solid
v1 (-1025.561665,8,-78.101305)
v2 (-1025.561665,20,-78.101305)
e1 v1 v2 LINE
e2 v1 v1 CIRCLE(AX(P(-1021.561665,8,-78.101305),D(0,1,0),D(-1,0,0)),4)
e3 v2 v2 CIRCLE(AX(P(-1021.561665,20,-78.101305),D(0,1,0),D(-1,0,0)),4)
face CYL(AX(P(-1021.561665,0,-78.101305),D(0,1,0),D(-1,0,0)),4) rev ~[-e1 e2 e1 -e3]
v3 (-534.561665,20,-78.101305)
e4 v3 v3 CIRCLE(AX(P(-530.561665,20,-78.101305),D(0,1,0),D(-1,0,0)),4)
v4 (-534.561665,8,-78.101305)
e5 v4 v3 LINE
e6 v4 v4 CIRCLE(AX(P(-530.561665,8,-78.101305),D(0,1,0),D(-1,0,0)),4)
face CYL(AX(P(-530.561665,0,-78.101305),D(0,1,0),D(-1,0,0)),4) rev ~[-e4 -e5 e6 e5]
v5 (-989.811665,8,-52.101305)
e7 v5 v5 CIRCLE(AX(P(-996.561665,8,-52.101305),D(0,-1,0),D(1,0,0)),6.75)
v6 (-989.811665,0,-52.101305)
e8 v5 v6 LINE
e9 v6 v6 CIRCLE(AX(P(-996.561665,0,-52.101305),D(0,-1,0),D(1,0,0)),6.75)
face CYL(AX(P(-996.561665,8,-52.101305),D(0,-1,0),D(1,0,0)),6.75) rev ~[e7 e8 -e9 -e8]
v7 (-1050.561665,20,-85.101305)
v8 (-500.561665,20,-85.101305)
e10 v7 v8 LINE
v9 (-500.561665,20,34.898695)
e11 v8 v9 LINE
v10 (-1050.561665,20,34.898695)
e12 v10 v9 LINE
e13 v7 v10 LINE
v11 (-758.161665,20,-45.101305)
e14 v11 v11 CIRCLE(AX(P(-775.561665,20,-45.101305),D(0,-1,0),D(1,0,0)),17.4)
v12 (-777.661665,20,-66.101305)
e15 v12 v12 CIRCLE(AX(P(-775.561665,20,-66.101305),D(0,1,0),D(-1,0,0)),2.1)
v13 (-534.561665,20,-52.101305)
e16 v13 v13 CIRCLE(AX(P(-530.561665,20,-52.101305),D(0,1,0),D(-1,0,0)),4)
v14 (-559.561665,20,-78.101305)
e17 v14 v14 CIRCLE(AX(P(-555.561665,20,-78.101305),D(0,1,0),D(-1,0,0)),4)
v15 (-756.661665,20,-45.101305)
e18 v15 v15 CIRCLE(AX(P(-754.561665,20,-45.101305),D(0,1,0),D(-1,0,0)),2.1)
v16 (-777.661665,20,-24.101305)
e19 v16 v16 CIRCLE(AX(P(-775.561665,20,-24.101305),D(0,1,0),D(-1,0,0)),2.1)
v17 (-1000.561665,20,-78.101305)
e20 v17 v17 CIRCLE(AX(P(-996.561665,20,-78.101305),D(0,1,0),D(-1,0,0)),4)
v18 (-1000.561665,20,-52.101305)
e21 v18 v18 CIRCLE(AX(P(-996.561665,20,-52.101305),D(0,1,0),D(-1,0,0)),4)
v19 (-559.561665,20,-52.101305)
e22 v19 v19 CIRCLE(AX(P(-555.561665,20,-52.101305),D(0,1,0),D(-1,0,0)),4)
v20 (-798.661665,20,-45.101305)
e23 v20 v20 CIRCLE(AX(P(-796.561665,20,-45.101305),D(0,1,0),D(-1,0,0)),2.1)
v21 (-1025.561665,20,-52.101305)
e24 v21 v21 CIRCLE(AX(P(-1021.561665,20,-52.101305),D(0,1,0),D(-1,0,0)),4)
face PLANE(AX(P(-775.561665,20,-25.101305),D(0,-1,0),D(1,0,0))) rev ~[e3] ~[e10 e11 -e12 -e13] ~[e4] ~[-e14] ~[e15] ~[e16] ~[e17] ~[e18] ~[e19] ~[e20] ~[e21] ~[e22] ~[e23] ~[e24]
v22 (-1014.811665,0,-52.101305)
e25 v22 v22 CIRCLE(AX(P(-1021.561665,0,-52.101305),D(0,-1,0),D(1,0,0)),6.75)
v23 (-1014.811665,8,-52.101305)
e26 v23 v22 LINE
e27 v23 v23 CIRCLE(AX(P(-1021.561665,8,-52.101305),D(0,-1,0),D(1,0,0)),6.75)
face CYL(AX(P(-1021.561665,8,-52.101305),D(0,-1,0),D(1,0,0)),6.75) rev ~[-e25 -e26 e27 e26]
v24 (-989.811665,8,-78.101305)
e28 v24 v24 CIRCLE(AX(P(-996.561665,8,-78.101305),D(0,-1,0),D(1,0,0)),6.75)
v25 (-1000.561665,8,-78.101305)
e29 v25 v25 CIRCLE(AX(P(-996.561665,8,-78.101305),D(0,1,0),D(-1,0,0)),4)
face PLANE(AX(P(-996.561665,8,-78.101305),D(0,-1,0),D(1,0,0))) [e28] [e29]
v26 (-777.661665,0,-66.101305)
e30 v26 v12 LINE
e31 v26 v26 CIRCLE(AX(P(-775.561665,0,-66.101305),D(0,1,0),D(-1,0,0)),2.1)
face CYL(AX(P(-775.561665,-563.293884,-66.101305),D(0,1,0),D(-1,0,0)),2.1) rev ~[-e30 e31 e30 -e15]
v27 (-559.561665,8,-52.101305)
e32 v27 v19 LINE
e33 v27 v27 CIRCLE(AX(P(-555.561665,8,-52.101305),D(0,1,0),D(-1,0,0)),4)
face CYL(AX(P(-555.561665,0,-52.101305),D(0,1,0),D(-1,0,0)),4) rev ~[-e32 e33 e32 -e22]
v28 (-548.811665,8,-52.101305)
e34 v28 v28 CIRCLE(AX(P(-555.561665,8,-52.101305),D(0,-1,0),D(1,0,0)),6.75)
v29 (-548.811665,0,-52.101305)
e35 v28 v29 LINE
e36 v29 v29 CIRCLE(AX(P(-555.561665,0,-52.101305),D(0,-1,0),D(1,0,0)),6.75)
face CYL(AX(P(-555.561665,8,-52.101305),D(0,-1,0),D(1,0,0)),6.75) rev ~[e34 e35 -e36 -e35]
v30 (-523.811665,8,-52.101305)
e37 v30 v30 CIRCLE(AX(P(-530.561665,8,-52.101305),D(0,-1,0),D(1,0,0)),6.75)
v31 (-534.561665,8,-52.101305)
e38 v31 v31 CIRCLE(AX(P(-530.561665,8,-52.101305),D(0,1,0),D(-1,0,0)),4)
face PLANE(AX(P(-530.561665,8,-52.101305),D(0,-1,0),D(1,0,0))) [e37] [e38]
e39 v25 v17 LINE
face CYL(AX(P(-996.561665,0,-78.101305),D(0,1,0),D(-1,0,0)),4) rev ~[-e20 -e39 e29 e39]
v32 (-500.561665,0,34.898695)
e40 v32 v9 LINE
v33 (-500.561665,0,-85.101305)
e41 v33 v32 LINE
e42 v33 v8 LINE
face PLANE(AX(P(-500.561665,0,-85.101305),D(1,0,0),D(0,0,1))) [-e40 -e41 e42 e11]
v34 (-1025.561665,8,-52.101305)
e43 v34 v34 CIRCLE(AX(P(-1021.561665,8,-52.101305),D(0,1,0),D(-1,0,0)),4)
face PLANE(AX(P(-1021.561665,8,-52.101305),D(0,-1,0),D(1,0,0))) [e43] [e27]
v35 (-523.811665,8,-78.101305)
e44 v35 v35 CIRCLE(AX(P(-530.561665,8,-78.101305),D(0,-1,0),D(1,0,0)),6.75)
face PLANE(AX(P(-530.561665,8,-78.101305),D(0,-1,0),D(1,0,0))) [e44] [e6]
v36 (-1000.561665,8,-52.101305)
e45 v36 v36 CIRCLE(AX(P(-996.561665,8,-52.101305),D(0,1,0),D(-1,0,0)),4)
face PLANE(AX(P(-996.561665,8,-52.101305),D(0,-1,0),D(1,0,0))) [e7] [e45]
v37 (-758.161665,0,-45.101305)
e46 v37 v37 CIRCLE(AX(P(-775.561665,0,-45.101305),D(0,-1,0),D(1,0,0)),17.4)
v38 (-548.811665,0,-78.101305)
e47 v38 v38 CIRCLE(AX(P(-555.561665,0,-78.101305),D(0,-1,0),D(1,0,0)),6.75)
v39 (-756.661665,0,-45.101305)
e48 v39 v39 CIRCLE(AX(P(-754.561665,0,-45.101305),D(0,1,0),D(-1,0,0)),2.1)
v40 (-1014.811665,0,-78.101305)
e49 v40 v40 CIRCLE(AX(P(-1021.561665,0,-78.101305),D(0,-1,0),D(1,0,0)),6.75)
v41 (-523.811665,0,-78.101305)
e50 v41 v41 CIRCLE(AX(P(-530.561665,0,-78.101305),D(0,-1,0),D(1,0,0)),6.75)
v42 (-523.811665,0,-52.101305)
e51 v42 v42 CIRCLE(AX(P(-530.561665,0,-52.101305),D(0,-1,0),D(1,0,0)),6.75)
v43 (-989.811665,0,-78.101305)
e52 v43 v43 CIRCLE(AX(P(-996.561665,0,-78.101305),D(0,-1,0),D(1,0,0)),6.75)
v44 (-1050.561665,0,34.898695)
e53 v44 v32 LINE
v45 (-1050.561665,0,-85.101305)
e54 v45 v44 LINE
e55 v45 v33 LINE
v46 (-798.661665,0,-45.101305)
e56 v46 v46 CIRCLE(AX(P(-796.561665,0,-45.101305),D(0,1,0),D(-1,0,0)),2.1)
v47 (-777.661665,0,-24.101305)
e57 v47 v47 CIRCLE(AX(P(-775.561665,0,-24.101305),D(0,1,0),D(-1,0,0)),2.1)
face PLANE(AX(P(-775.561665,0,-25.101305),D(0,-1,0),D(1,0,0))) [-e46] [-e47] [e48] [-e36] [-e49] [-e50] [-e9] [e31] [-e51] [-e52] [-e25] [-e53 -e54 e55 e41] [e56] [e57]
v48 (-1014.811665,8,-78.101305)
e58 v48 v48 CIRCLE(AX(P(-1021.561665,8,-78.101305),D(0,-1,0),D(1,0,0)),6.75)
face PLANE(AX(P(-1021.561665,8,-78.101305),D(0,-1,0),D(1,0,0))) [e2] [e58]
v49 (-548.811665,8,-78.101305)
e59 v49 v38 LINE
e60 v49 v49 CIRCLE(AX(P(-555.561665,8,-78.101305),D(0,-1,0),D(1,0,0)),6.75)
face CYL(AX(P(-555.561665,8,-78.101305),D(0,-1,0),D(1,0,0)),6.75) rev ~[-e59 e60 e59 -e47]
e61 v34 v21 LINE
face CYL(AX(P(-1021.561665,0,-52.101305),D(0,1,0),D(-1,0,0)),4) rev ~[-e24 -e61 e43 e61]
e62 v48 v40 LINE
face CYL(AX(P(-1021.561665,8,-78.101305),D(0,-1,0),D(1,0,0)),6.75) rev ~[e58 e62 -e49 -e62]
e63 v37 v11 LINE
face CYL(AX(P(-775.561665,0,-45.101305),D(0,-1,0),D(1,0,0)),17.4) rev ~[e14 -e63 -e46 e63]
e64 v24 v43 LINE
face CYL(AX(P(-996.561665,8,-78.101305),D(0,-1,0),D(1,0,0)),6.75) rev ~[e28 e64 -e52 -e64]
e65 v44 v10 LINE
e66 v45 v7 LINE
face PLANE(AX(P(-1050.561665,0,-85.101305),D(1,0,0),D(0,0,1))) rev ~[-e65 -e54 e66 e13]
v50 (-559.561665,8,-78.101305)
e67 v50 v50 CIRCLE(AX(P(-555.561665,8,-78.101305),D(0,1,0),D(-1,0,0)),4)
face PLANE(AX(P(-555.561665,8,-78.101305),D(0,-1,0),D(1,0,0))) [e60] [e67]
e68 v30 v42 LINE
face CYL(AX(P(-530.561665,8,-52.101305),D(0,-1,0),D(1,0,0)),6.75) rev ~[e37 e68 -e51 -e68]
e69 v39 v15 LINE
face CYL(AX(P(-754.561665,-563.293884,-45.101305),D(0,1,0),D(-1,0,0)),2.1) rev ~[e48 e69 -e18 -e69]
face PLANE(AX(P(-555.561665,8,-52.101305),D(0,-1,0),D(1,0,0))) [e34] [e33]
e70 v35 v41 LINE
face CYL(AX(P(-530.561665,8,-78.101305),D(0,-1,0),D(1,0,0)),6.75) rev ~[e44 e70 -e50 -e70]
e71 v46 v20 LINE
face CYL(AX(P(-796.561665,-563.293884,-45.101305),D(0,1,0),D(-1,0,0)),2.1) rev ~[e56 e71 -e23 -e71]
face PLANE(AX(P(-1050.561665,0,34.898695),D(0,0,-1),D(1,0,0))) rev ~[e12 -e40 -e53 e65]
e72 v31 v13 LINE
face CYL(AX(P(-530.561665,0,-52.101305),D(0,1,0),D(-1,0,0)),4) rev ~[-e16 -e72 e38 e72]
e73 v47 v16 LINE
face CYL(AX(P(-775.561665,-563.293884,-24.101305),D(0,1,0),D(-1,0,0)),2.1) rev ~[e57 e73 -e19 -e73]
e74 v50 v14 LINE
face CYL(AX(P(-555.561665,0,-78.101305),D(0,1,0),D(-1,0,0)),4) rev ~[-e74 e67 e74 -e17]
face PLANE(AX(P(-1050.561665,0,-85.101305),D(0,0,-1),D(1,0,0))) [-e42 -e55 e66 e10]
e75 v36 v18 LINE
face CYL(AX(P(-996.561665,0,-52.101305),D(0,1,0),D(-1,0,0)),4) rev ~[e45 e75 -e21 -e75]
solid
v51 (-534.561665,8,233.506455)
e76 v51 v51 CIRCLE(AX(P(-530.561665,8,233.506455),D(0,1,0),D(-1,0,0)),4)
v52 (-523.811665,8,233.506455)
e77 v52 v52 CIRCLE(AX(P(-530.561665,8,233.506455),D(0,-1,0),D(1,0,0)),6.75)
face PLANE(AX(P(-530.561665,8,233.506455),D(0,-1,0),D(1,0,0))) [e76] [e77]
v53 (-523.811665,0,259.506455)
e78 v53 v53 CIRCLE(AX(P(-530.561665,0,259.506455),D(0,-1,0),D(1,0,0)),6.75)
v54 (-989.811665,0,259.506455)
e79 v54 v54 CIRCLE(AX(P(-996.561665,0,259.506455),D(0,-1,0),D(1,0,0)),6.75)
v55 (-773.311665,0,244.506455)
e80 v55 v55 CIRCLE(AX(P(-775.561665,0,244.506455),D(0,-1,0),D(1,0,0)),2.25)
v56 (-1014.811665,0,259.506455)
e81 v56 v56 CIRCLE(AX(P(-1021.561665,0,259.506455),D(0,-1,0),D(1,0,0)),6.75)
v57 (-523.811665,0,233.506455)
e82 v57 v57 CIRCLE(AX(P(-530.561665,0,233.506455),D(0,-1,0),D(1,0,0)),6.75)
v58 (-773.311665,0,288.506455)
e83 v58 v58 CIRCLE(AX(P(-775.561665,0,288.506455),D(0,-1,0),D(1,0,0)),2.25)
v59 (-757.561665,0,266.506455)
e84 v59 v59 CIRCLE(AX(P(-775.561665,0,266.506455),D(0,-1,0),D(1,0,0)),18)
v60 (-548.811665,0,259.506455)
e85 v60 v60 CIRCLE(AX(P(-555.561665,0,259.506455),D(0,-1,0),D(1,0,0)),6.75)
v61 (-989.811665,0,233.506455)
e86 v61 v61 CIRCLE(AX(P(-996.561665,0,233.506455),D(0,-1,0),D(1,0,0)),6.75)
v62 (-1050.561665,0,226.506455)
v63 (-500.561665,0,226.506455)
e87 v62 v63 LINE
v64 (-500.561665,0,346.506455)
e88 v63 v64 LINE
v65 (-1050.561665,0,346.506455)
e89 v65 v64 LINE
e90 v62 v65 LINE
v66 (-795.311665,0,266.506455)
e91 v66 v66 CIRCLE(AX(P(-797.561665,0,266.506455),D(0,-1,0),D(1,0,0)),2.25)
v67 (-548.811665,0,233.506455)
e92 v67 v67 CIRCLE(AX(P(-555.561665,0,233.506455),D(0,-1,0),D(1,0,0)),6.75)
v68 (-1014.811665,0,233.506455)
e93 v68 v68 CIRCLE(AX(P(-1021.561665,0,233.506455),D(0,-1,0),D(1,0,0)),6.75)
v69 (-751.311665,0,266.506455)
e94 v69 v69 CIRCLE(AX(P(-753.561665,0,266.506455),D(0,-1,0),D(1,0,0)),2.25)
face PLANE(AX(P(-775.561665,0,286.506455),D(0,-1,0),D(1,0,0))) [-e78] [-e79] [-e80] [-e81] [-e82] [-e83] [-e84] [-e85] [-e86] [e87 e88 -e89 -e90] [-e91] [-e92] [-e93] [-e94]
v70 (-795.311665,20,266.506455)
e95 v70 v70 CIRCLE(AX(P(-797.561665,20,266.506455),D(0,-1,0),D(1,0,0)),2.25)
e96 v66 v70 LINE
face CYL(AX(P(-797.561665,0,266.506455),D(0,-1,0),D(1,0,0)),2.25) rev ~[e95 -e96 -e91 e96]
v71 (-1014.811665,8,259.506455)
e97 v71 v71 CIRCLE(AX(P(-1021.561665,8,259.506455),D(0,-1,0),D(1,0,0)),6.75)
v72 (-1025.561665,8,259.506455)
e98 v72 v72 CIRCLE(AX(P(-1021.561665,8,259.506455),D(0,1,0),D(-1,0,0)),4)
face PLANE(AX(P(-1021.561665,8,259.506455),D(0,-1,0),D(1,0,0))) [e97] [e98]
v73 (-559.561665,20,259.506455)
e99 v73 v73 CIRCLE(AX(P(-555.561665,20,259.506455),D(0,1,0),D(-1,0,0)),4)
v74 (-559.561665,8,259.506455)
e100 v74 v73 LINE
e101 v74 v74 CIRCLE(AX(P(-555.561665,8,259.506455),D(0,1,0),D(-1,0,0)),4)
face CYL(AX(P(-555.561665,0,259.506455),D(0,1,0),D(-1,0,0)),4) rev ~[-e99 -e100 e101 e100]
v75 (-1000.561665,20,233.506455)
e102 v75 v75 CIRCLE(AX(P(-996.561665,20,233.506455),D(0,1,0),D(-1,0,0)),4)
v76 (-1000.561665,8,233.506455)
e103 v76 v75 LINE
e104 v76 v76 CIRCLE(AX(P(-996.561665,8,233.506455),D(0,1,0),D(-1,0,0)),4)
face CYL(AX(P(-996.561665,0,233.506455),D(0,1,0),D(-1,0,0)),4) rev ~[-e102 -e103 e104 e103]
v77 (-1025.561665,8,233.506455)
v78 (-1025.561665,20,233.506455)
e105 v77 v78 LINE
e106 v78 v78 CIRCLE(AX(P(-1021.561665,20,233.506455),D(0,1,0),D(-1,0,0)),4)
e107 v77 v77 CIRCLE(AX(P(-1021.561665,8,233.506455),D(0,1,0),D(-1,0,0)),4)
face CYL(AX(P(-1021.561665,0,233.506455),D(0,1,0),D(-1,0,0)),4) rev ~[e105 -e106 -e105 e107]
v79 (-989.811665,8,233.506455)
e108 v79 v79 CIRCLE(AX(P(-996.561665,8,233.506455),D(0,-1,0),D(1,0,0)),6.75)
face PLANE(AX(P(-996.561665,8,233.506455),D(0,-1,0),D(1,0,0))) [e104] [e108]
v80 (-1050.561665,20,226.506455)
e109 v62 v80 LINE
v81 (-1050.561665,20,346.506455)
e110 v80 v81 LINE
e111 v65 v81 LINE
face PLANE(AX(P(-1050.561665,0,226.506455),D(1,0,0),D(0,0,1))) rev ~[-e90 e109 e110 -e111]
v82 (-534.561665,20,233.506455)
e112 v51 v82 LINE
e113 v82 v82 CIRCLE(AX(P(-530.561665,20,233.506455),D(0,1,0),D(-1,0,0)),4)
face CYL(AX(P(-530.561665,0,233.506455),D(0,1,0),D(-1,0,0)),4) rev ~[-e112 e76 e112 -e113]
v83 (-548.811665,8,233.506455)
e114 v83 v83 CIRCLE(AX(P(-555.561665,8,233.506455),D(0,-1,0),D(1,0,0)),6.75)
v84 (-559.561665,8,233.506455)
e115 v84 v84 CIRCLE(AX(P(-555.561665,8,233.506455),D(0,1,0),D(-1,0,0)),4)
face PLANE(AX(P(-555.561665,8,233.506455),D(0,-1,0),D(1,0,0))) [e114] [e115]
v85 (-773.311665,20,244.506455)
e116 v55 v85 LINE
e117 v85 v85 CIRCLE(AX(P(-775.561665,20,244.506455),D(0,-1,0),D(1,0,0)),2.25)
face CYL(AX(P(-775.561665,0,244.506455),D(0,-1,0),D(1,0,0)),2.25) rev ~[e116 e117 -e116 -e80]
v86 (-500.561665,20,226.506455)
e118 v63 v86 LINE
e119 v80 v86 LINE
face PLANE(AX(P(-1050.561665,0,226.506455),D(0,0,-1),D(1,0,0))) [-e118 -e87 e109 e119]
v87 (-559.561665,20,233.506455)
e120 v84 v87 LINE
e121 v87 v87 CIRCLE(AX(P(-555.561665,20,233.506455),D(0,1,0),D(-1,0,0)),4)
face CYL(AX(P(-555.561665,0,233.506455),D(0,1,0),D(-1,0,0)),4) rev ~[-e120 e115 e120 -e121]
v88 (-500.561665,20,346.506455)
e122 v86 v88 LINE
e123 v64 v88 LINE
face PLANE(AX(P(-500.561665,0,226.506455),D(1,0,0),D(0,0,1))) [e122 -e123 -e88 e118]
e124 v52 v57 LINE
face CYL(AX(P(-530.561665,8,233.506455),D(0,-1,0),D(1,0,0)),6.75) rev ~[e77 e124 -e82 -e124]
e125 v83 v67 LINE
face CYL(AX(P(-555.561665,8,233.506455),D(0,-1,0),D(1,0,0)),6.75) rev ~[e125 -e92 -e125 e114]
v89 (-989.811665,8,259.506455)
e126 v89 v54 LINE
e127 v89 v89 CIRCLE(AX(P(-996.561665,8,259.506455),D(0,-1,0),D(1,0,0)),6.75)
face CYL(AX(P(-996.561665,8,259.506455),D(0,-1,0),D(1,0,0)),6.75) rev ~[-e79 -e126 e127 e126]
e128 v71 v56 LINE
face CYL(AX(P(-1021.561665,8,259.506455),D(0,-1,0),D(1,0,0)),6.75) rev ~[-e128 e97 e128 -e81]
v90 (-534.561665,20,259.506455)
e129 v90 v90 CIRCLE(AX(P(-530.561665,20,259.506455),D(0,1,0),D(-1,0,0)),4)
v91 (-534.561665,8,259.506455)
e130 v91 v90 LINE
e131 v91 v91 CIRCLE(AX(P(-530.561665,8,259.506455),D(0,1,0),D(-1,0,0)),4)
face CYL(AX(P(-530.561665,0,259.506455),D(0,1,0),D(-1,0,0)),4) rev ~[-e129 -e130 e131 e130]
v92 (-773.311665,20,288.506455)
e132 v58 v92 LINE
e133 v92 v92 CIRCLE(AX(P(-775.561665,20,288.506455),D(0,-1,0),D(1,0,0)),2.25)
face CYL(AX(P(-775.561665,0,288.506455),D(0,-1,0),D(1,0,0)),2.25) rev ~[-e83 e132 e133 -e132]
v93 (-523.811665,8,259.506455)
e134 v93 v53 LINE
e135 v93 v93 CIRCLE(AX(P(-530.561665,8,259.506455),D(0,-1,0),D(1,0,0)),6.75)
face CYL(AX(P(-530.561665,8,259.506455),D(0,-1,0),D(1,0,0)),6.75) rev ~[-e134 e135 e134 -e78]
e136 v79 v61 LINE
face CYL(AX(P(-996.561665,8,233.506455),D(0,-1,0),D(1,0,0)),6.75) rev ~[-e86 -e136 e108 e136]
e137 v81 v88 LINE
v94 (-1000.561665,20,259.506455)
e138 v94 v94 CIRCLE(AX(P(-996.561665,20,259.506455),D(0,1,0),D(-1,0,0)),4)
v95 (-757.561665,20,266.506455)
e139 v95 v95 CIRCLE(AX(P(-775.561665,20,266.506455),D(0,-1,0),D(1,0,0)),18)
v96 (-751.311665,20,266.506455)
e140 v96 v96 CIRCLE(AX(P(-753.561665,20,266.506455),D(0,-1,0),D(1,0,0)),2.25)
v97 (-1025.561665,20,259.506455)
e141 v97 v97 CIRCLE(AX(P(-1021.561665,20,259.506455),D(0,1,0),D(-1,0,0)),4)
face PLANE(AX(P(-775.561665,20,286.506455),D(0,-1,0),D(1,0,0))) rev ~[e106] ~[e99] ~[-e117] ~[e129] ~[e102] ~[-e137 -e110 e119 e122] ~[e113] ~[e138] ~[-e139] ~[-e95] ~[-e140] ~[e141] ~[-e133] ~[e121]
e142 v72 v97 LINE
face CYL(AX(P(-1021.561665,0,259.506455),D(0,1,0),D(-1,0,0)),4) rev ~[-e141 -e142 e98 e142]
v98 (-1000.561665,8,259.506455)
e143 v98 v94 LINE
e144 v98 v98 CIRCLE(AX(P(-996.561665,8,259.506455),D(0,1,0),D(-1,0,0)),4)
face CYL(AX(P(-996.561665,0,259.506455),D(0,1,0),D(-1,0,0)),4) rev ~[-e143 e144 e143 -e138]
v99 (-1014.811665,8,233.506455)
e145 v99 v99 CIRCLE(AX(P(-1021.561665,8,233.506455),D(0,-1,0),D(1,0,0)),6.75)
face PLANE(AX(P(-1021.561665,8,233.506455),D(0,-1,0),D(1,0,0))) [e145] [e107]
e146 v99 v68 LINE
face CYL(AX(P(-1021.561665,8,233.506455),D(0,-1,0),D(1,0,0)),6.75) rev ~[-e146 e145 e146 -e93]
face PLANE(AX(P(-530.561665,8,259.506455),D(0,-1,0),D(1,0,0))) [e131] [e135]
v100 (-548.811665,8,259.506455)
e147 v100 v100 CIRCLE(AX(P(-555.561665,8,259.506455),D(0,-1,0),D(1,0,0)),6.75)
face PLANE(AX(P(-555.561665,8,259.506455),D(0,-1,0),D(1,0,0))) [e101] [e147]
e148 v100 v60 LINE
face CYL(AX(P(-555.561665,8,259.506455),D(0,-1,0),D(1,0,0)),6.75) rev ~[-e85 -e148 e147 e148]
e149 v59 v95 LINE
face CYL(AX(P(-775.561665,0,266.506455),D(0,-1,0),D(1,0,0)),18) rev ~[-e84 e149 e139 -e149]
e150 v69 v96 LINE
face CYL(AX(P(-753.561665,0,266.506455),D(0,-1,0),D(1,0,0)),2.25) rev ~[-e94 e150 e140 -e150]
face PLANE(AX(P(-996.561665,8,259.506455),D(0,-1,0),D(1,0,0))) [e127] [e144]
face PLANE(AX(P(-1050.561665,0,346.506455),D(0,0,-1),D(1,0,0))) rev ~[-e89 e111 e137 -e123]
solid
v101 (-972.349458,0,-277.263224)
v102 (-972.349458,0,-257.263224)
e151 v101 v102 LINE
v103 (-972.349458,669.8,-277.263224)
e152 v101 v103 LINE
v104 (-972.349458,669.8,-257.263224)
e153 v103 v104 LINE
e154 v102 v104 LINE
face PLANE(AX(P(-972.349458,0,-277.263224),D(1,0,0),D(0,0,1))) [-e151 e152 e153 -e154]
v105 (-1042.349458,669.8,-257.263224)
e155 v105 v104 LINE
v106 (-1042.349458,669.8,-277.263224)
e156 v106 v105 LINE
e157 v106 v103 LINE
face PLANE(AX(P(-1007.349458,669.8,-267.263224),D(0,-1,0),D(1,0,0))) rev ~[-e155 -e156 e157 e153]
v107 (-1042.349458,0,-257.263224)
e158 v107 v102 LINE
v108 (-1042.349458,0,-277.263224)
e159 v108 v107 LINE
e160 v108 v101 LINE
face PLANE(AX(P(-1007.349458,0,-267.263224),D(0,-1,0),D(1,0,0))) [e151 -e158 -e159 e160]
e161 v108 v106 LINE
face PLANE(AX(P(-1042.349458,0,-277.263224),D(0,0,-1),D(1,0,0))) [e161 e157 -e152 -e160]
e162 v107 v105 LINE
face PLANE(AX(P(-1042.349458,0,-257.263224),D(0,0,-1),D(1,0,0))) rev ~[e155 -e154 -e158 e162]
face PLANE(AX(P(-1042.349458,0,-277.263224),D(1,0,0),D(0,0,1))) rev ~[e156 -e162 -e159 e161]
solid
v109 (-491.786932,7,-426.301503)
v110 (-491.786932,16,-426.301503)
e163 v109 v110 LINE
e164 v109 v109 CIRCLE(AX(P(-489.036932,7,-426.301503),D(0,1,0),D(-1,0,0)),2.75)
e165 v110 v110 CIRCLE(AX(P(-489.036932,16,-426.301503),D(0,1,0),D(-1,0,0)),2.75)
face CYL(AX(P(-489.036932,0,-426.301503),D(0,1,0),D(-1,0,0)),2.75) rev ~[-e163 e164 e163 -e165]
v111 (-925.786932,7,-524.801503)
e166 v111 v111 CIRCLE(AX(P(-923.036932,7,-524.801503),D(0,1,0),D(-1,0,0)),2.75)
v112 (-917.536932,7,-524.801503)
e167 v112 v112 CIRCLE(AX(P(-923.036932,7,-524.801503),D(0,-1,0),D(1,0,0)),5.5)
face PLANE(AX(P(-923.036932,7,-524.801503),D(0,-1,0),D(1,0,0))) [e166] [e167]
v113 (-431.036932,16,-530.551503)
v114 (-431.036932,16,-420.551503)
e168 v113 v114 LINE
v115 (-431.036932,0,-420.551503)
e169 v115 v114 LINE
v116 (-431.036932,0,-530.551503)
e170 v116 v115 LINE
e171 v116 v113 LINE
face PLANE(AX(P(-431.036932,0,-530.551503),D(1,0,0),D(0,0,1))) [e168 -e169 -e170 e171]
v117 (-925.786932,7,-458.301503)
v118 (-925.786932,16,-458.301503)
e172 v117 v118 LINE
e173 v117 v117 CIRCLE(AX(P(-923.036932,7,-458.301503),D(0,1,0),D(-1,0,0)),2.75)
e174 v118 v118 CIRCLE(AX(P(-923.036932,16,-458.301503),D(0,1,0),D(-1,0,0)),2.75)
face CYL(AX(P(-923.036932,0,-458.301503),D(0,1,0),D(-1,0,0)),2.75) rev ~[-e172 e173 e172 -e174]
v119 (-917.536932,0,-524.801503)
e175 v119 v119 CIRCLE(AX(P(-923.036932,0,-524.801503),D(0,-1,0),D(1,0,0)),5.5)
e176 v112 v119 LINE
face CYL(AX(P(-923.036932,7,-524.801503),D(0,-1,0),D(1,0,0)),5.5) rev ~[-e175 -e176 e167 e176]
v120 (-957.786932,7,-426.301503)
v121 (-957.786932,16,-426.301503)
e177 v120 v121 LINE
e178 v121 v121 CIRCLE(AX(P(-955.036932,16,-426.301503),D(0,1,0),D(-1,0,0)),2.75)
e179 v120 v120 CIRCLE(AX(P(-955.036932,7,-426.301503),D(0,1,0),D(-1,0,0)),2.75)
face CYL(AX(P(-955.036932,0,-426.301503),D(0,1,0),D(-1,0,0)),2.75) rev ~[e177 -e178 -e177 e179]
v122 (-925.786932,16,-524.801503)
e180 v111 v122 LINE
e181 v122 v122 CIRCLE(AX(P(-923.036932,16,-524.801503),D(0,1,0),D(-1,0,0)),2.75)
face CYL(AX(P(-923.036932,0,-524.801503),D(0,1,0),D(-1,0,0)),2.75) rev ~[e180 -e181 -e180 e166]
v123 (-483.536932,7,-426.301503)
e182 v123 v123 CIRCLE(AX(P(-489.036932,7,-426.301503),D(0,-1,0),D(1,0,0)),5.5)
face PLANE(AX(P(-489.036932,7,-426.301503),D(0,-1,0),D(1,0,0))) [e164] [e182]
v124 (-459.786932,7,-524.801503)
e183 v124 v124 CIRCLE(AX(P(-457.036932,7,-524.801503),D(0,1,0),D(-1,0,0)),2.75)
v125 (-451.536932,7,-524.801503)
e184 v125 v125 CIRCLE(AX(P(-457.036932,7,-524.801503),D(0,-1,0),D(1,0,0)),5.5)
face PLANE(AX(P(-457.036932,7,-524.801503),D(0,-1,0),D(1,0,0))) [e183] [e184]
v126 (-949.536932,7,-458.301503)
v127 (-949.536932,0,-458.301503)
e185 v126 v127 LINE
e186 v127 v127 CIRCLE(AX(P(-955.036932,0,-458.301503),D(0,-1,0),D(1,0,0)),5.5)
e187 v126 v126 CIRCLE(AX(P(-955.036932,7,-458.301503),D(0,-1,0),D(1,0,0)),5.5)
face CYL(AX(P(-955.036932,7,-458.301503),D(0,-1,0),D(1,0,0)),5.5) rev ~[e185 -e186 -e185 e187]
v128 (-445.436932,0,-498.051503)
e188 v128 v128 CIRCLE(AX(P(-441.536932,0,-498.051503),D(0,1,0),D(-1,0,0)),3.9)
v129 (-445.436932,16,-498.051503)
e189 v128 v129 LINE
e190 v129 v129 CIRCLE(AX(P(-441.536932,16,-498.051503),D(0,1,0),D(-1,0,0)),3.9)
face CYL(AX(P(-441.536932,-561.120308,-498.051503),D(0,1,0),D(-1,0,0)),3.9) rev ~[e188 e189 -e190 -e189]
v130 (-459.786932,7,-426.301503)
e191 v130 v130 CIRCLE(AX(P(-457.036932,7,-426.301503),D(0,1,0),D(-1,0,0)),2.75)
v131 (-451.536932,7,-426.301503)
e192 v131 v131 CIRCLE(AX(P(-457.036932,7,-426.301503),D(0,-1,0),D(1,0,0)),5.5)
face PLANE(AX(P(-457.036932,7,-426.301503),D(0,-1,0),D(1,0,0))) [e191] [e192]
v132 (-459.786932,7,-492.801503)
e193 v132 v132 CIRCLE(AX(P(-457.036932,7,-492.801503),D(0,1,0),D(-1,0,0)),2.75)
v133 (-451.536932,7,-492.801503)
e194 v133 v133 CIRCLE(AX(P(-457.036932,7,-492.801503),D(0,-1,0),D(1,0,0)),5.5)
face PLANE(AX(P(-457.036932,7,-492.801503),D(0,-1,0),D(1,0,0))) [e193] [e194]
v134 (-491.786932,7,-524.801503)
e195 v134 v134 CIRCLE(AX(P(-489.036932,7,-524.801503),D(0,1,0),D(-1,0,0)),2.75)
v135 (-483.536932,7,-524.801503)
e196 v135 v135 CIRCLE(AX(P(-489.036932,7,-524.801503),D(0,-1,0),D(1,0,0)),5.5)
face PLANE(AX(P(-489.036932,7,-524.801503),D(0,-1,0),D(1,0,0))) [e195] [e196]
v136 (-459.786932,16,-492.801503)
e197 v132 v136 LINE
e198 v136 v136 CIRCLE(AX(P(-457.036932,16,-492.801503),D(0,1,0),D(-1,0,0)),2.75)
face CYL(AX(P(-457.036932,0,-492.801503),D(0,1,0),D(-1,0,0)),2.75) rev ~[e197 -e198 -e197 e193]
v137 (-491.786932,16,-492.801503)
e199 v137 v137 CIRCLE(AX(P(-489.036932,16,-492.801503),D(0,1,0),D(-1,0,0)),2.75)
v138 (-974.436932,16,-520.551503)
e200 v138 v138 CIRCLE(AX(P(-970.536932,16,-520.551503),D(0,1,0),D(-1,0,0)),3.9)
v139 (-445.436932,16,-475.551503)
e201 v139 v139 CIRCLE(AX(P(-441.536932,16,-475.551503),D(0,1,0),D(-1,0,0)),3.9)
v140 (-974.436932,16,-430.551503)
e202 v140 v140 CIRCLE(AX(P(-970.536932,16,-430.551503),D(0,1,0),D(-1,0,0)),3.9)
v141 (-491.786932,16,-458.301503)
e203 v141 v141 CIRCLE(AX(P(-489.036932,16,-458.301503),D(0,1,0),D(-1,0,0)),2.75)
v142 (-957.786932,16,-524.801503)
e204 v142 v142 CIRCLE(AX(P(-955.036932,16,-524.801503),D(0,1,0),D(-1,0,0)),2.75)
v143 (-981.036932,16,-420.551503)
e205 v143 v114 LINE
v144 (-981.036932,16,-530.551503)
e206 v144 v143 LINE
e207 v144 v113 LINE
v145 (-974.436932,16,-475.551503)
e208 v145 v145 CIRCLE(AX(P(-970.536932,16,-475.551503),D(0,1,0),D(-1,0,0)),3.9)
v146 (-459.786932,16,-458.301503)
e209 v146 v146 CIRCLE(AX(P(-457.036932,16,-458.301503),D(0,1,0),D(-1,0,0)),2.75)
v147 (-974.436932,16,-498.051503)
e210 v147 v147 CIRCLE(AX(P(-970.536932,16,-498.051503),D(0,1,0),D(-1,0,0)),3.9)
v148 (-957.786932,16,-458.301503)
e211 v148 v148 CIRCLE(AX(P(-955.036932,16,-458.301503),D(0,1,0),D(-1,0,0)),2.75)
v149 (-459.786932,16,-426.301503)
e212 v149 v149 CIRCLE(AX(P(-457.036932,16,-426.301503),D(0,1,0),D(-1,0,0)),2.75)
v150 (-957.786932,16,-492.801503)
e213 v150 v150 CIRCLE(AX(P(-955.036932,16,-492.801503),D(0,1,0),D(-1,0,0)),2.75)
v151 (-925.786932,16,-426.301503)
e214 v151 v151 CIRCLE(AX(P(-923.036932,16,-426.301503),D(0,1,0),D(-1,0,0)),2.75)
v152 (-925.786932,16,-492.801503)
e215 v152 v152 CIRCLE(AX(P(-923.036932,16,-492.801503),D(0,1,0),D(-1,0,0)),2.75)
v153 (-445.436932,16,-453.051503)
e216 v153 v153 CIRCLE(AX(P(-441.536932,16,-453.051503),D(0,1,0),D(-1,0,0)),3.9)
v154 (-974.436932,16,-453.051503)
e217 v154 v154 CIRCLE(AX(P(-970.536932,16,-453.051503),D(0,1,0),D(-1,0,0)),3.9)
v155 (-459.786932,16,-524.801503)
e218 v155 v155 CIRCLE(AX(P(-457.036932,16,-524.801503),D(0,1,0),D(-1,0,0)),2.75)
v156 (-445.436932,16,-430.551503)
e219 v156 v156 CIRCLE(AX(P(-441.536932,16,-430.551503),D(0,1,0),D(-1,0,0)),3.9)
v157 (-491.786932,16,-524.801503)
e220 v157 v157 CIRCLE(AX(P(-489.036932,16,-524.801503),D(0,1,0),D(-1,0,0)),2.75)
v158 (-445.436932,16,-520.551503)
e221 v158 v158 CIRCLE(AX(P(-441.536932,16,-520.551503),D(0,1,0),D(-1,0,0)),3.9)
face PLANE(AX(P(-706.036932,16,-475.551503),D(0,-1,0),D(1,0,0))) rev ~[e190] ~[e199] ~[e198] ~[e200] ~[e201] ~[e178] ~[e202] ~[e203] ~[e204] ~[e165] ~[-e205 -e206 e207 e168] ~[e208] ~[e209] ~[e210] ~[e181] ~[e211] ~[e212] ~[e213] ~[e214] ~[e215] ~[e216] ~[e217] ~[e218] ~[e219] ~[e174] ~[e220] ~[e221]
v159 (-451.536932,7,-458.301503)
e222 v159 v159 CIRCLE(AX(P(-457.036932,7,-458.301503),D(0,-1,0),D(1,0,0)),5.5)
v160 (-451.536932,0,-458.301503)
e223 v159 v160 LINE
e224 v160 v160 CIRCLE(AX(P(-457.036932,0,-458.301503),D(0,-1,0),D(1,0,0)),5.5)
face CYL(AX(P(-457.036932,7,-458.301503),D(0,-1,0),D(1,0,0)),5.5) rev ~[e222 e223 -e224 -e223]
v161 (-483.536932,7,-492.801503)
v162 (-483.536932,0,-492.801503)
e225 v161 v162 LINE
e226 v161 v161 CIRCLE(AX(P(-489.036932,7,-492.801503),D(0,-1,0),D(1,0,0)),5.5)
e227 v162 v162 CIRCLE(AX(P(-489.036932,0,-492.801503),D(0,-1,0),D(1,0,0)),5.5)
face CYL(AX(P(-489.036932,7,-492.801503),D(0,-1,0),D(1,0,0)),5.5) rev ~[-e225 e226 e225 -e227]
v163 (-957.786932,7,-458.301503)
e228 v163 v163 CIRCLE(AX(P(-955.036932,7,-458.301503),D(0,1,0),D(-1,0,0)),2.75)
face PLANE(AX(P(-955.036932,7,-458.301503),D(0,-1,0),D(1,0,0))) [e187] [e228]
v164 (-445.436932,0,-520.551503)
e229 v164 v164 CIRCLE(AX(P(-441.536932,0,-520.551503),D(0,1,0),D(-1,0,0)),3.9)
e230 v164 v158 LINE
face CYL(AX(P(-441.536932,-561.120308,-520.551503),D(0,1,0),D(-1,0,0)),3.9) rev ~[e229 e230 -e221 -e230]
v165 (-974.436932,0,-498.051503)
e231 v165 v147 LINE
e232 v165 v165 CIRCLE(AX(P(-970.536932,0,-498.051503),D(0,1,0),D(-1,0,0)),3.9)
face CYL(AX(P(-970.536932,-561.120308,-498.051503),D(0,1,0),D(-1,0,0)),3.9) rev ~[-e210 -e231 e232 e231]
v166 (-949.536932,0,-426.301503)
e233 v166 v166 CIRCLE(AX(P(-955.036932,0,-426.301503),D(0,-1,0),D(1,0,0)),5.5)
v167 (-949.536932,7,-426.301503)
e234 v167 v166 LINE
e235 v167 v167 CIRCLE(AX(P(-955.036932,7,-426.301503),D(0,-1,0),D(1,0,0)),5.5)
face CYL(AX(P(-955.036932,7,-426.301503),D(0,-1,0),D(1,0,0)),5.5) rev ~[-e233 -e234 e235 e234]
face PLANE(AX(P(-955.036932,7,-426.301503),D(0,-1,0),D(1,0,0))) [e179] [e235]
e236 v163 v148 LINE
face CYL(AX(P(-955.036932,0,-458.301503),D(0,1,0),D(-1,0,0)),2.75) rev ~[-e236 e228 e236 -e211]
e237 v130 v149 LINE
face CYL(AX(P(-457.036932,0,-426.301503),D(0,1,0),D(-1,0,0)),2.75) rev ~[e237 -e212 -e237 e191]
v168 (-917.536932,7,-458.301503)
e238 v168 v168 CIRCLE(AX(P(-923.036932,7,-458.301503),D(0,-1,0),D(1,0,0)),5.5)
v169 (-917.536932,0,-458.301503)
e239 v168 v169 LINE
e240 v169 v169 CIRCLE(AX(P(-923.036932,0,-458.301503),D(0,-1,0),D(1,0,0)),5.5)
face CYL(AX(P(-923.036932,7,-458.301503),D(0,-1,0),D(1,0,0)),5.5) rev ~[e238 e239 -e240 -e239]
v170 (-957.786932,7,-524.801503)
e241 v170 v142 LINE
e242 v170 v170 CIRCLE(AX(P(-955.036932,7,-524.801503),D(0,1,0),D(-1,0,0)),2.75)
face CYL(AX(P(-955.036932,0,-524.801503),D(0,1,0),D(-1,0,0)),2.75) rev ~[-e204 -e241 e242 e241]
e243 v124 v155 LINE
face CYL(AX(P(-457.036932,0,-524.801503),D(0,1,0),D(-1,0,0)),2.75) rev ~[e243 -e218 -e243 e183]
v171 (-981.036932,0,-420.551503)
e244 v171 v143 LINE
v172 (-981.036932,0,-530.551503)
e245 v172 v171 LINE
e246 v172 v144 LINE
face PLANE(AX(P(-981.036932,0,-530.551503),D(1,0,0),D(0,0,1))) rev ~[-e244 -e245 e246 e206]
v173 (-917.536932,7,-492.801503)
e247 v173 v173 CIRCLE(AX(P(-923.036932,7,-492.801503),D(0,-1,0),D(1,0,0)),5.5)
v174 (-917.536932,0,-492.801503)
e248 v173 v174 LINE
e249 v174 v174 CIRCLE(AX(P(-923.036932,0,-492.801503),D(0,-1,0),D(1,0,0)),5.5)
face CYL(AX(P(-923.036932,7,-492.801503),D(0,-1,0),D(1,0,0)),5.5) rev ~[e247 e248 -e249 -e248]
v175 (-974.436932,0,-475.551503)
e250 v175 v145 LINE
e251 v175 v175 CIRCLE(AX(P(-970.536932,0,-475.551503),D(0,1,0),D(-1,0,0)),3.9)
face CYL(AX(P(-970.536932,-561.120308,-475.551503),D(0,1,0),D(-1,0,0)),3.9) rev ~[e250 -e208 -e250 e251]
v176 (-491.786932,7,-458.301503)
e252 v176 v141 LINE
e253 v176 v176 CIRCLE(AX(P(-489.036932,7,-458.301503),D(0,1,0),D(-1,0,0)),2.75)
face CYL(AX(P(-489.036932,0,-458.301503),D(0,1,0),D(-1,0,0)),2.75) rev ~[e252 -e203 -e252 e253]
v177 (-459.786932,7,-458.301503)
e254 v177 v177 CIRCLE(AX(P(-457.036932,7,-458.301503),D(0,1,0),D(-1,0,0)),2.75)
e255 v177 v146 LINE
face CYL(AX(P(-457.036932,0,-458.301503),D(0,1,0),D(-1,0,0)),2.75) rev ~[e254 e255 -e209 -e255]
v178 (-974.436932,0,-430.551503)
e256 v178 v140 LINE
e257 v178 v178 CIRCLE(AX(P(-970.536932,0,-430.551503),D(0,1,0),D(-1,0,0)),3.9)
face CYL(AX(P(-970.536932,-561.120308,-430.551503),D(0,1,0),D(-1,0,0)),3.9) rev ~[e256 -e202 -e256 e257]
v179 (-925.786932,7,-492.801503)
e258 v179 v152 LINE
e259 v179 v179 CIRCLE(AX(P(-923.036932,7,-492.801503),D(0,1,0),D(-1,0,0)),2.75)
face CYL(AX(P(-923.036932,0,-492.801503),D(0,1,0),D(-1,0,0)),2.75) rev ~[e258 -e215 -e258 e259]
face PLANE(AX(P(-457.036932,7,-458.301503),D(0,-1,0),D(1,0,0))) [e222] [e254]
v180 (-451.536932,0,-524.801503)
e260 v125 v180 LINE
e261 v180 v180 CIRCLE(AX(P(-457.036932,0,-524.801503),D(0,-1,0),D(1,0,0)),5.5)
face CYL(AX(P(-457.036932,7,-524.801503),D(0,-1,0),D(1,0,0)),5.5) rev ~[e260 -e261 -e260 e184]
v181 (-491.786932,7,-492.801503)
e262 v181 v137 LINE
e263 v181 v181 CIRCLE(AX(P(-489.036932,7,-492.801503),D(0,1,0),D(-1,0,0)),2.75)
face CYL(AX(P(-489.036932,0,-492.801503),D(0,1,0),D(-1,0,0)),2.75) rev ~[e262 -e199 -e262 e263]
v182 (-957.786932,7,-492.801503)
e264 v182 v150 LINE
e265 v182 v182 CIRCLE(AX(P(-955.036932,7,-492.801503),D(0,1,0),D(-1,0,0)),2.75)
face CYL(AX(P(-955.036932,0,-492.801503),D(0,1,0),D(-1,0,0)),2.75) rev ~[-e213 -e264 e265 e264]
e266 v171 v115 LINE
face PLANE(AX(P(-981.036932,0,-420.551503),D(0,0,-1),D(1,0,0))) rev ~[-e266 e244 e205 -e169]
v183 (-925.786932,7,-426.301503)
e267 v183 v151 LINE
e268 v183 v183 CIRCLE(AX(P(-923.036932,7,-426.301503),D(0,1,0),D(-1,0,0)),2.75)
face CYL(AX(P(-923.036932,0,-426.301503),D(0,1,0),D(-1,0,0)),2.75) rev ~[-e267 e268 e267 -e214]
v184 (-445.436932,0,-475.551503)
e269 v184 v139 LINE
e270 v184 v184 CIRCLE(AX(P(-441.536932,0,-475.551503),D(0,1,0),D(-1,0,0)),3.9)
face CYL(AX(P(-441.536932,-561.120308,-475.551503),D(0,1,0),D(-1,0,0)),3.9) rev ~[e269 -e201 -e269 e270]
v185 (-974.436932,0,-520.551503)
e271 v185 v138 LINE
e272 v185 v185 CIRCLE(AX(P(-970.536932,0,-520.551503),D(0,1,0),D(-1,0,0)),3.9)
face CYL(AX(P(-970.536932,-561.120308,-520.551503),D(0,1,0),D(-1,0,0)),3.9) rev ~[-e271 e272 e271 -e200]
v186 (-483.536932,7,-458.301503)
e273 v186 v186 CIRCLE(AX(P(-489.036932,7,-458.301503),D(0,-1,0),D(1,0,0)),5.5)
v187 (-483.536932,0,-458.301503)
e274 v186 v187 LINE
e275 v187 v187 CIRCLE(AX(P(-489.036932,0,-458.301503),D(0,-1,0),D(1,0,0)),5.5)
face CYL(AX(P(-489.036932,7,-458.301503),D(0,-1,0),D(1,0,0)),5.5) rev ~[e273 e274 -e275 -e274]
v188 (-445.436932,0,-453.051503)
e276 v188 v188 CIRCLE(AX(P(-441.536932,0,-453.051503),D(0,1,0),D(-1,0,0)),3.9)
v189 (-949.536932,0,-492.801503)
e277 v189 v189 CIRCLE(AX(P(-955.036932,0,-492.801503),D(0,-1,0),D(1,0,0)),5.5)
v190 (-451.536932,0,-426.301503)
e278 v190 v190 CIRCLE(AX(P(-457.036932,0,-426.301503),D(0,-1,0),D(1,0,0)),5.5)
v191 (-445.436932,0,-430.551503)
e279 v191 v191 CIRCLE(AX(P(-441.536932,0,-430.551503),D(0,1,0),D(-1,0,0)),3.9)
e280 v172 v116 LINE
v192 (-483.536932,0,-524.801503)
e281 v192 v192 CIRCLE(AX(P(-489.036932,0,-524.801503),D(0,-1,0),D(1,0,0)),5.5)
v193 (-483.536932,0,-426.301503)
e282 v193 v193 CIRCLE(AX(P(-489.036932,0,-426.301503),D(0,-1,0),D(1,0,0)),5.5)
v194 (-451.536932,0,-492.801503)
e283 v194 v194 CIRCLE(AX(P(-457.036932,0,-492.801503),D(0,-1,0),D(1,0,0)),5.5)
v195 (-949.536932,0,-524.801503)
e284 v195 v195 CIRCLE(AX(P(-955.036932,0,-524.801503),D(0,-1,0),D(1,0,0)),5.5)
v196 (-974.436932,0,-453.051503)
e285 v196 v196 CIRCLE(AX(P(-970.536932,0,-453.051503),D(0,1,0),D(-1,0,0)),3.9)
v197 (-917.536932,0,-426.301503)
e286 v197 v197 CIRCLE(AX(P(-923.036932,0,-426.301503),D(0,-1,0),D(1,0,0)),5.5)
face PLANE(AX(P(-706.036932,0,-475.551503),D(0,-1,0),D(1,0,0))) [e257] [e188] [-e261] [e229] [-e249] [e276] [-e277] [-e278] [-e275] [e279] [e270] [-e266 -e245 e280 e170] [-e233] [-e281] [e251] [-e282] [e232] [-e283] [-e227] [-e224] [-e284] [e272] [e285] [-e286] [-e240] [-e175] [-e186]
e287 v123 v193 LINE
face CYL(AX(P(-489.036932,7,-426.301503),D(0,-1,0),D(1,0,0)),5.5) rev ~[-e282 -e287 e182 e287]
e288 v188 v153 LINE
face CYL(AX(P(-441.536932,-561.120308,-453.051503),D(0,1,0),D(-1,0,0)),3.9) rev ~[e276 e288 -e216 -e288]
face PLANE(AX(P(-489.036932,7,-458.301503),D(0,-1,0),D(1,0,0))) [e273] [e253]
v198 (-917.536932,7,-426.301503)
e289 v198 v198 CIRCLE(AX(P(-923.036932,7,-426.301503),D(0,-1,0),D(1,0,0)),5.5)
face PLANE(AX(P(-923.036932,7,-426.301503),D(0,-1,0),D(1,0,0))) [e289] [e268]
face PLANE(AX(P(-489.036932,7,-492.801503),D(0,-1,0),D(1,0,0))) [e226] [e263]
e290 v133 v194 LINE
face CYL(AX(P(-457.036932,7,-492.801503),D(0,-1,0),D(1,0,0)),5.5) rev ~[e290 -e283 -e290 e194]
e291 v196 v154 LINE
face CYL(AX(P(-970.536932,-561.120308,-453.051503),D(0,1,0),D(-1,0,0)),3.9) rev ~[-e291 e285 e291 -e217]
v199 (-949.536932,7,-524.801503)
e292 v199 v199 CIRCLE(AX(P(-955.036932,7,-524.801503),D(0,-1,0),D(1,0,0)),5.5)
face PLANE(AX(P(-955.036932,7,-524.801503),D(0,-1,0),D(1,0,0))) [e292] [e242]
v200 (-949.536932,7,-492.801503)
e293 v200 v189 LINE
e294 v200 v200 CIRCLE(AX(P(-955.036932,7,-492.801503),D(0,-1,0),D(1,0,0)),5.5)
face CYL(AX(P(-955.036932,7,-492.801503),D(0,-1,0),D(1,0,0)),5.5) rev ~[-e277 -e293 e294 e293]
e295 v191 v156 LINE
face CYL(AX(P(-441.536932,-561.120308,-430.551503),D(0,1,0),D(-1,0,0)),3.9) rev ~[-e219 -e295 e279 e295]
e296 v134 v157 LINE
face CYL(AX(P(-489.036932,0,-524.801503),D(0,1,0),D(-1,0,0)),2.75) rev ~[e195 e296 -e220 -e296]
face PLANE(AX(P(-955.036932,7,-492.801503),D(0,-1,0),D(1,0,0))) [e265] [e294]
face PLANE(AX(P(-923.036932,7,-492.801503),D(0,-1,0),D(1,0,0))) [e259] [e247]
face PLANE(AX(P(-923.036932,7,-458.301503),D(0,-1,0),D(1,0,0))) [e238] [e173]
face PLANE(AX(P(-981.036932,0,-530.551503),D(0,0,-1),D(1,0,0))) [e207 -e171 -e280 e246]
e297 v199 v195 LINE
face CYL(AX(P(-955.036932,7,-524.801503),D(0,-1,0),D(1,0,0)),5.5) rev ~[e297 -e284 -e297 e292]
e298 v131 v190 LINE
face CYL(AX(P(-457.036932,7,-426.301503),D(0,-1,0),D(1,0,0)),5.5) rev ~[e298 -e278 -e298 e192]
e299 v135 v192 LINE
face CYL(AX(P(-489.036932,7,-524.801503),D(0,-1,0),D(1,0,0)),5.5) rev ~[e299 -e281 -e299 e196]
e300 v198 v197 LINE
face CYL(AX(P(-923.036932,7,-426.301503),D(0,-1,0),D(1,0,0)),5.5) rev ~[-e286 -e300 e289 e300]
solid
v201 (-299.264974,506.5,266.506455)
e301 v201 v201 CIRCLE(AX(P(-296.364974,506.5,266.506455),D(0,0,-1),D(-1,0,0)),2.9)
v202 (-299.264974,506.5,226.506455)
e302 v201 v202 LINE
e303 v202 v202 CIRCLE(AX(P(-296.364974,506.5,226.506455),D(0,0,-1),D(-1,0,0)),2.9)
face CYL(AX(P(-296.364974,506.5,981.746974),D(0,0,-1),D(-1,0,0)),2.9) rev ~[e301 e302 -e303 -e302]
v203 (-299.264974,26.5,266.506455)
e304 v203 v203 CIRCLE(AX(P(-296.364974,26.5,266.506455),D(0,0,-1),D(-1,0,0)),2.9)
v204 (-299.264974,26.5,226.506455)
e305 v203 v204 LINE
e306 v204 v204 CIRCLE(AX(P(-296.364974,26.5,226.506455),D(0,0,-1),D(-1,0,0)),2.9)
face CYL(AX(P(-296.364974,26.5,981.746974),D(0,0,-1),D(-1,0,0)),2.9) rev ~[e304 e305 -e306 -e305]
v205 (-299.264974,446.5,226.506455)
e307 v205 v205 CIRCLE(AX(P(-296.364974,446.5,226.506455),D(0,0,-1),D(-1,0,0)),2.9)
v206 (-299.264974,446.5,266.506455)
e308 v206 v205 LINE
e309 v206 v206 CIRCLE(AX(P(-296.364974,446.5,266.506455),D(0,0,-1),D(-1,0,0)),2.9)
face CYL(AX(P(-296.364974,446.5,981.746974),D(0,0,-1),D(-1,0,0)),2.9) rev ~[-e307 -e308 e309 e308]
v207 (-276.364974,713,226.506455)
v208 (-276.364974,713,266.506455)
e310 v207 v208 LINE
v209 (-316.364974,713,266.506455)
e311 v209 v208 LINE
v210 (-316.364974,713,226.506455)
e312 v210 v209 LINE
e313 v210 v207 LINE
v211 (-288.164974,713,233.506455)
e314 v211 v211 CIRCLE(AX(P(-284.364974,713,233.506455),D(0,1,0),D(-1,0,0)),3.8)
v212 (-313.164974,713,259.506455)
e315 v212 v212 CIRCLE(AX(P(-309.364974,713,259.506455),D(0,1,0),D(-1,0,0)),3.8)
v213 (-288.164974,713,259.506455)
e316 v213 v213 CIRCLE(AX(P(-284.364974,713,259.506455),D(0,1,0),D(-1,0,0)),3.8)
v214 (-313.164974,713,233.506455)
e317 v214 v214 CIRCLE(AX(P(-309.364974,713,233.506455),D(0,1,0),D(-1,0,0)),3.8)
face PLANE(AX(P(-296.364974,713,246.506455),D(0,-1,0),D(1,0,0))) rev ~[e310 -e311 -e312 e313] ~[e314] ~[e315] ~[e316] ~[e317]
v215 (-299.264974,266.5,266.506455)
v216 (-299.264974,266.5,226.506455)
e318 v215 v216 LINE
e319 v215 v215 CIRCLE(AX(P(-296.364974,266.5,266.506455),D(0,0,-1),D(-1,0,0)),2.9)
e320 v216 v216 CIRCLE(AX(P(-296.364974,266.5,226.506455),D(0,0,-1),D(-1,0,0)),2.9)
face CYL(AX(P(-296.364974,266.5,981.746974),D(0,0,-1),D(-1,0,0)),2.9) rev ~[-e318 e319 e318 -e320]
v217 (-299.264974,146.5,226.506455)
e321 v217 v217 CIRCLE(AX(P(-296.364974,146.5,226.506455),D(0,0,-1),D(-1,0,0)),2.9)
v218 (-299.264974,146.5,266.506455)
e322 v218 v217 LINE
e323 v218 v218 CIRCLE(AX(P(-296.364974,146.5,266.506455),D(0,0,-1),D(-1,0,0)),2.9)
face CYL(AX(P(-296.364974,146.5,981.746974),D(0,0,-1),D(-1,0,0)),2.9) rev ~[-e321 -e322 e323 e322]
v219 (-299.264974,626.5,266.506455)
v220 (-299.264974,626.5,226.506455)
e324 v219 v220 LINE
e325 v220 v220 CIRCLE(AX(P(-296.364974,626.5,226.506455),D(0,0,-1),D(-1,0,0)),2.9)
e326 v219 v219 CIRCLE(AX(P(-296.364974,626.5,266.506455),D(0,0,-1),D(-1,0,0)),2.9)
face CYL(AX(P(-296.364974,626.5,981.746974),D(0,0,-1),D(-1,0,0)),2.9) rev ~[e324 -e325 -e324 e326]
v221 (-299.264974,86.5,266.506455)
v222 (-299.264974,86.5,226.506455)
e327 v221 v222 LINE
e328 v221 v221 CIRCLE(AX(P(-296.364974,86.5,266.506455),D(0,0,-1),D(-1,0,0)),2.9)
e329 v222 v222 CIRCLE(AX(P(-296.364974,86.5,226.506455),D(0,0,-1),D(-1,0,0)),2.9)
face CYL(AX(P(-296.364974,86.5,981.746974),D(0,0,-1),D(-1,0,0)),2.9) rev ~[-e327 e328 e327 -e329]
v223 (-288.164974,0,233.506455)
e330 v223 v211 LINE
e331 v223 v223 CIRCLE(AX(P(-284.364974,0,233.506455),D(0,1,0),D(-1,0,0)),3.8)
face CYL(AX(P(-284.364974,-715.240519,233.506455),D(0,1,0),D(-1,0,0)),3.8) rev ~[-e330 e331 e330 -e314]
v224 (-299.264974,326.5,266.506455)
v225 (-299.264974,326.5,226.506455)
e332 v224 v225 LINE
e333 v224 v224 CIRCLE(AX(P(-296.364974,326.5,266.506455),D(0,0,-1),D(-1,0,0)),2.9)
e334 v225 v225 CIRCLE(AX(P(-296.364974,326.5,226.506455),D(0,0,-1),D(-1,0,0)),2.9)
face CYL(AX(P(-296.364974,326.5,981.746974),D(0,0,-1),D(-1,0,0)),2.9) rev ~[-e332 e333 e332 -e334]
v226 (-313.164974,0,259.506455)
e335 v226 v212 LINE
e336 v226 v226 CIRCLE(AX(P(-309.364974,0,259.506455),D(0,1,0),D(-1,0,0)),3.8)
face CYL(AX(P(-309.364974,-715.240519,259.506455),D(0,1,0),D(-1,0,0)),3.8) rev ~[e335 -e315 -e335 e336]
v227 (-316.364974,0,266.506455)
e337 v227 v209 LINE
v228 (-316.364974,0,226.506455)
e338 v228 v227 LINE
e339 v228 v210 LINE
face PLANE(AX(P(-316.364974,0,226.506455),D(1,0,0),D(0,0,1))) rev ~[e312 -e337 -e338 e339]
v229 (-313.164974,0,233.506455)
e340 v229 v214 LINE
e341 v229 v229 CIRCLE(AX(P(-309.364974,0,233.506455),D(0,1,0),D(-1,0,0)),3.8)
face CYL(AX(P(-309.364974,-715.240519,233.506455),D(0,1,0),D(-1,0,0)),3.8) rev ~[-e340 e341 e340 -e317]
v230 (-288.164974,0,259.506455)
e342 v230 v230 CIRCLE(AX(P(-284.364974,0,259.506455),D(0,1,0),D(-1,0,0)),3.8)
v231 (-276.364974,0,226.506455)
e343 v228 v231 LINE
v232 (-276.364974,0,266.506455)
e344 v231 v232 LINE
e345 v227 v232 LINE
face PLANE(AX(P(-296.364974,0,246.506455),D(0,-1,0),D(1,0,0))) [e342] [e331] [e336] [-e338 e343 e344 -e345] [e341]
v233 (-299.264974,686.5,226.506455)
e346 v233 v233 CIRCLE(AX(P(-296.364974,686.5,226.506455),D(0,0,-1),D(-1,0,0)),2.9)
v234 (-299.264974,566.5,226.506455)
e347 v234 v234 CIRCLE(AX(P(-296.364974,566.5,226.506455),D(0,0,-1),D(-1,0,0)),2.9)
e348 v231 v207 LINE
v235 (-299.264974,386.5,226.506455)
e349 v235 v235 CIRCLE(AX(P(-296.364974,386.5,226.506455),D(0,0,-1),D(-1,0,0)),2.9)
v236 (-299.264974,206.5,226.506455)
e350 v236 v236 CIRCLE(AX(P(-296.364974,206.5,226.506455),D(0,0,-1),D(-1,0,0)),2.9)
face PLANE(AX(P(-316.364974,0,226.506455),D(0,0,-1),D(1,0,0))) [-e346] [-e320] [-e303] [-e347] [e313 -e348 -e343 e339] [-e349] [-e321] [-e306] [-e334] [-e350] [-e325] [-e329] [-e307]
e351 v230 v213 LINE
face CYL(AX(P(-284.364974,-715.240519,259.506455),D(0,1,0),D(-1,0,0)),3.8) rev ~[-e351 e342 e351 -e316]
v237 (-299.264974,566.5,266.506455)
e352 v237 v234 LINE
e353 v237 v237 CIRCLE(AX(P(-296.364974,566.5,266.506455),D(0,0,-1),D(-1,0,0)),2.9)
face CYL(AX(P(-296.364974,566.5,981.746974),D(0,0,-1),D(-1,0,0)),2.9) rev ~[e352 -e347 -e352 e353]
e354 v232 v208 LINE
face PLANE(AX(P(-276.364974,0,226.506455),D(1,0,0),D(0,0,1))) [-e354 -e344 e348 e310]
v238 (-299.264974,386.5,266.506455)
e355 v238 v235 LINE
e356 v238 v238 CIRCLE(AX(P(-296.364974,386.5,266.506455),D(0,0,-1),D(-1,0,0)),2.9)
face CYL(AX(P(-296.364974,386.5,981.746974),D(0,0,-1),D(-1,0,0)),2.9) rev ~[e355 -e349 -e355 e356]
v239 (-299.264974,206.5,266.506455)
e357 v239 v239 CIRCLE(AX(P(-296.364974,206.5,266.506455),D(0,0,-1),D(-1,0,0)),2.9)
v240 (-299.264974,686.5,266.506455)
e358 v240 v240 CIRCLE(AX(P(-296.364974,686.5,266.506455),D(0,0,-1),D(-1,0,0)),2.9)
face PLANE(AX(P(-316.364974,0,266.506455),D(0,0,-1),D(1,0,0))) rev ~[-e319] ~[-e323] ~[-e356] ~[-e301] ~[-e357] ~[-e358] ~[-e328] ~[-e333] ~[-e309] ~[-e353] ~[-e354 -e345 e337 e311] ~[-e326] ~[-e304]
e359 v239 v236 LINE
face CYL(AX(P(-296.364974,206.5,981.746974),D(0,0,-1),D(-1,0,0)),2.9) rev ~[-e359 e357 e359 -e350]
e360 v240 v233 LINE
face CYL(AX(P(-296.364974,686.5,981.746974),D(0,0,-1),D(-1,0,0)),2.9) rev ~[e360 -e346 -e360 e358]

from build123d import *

# Parameters (mm, degrees)
F0_W             = 550
F0_H             = 120
F0_R             = 2.25
F0_R_2           = 18
F1_DEPTH         = 20
F0_W_2           = 40
F0_H_2           = 40
F0_R_3           = 4
F2_DEPTH         = 713
F0_R_4           = 17.4
F3_DEPTH         = 20
F0_W_3           = 70
F0_H_3           = 20
F4_DEPTH         = 669.8
F0_H_4           = 110
F5_DEPTH         = 16
F7_D             = 4.2
F8_D             = 8
F8_CBORE_D       = 13.5
F8_CBORE_DEPTH   = 8
F8_2_D           = 8
F8_2_CBORE_D     = 13.5
F8_2_CBORE_DEPTH = 8
F9_D             = 7.6
F10_D            = 5.8
F11_D            = 5.5
F11_CBORE_D      = 11
F11_CBORE_DEPTH  = 7
F12_D            = 7.8


# Not quite as in the source:
# - a feature names something its author has since deleted; it is built from what else it names


with BuildPart() as f1:
    # F0 (on Front) → F1 (new body)
    with BuildSketch(Plane.XZ):
        with Locations((-775.5616648197, 286.5064552142)):
            Rectangle(F0_W, F0_H)
        with Locations((-775.5616648197, 244.5064552142)):
            Circle(F0_R, mode=Mode.SUBTRACT)
        with Locations((-797.5616648197, 266.5064552142)):
            Circle(F0_R, mode=Mode.SUBTRACT)
        with Locations((-775.5616648197, 266.5064552142)):
            Circle(F0_R_2, mode=Mode.SUBTRACT)
        with Locations((-775.5616648197, 288.5064552142)):
            Circle(F0_R, mode=Mode.SUBTRACT)
        with Locations((-753.5616648197, 266.5064552142)):
            Circle(F0_R, mode=Mode.SUBTRACT)
    extrude(amount=-F1_DEPTH)

    # F8 (through all)
    with Locations(Plane.XZ):
        with Locations((-1021.5616648197, 259.5064552142), (-996.5616648197, 259.5064552142), (-996.5616648197, 233.5064552142), (-1021.5616648197, 233.5064552142), (-555.5616648197, 259.5064552142), (-555.5616648197, 233.5064552142), (-530.5616648197, 233.5064552142), (-530.5616648197, 259.5064552142), (-1021.5616648197, -52.1013047353), (-996.5616648197, -52.1013047353), (-996.5616648197, -78.1013047353), (-1021.5616648197, -78.1013047353), (-555.5616648197, -52.1013047353), (-530.5616648197, -52.1013047353), (-530.5616648197, -78.1013047353), (-555.5616648197, -78.1013047353)):
            CounterBoreHole(F8_D / 2, F8_CBORE_D / 2, F8_CBORE_DEPTH)


with BuildPart() as f2:
    # F0 (on Front) → F2 (new body)
    with BuildSketch(Plane.XZ):
        with Locations((-296.3649737835, 246.5064552142)):
            Rectangle(F0_W_2, F0_H_2)
        with Locations((-309.3649737835, 233.5064552142)):
            Circle(F0_R_3, mode=Mode.SUBTRACT)
        with Locations((-284.3649737835, 233.5064552142)):
            Circle(F0_R_3, mode=Mode.SUBTRACT)
        with Locations((-309.3649737835, 259.5064552142)):
            Circle(F0_R_3, mode=Mode.SUBTRACT)
        with Locations((-284.3649737835, 259.5064552142)):
            Circle(F0_R_3, mode=Mode.SUBTRACT)
        with Locations((-309.3649737835, 259.5064552142)):
            Circle(F0_R_3)
        with Locations((-309.3649737835, 233.5064552142)):
            Circle(F0_R_3)
        with Locations((-284.3649737835, 259.5064552142)):
            Circle(F0_R_3)
        with Locations((-284.3649737835, 233.5064552142)):
            Circle(F0_R_3)
    extrude(amount=-F2_DEPTH)

    # F9 (through all)
    with Locations(Plane.XZ):
        with Locations((-309.3649737835, 233.5064552142), (-309.3649737835, 259.5064552142), (-284.3649737835, 259.5064552142), (-284.3649737835, 233.5064552142)):
            Hole(F9_D / 2)

    # F10 (through all)
    with Locations(Plane.XY.offset(266.5064552142)):
        with Locations((-296.3649737835, 26.5), (-296.3649737835, 86.5), (-296.3649737835, 146.5), (-296.3649737835, 206.5), (-296.3649737835, 266.5), (-296.3649737835, 326.5), (-296.3649737835, 386.5), (-296.3649737835, 446.5), (-296.3649737835, 506.5), (-296.3649737835, 566.5), (-296.3649737835, 626.5), (-296.3649737835, 26.5), (-296.3649737835, 86.5), (-296.3649737835, 146.5), (-296.3649737835, 206.5), (-296.3649737835, 266.5), (-296.3649737835, 326.5), (-296.3649737835, 386.5), (-296.3649737835, 446.5), (-296.3649737835, 506.5), (-296.3649737835, 566.5), (-296.3649737835, 626.5), (-296.3649737835, 686.5)):
            Hole(F10_D / 2)


with BuildPart() as f3:
    # F0 (on Front) → F3 (new body)
    with BuildSketch(Plane.XZ):
        with Locations((-775.5616648197, -25.1013047353)):
            Rectangle(F0_W, F0_H)
        with Locations((-775.5616648197, -45.1013047353)):
            Circle(F0_R_4, mode=Mode.SUBTRACT)
    extrude(amount=-F3_DEPTH)

    # F7 (through all)
    with Locations(Plane.XZ):
        with Locations((-796.5616648197, -45.1013047353), (-775.5616648197, -24.1013047353), (-754.5616648197, -45.1013047353), (-775.5616648197, -66.1013047353)):
            Hole(F7_D / 2)

    # F8#2 (through all)
    with Locations(Plane.XZ):
        with Locations((-1021.5616648197, 259.5064552142), (-996.5616648197, 259.5064552142), (-996.5616648197, 233.5064552142), (-1021.5616648197, 233.5064552142), (-555.5616648197, 259.5064552142), (-555.5616648197, 233.5064552142), (-530.5616648197, 233.5064552142), (-530.5616648197, 259.5064552142), (-1021.5616648197, -52.1013047353), (-996.5616648197, -52.1013047353), (-996.5616648197, -78.1013047353), (-1021.5616648197, -78.1013047353), (-555.5616648197, -52.1013047353), (-530.5616648197, -52.1013047353), (-530.5616648197, -78.1013047353), (-555.5616648197, -78.1013047353)):
            CounterBoreHole(F8_2_D / 2, F8_2_CBORE_D / 2, F8_2_CBORE_DEPTH)


with BuildPart() as f4:
    # F0 (on Front) → F4 (new body)
    with BuildSketch(Plane.XZ):
        with Locations((-1007.3494577408, -267.2632241249)):
            Rectangle(F0_W_3, F0_H_3)
    extrude(amount=-F4_DEPTH)


with BuildPart() as f5:
    # F0 (on Front) → F5 (new body)
    with BuildSketch(Plane.XZ):
        with Locations((-706.0369319916, -475.5515027046)):
            Rectangle(F0_W, F0_H_4)
    extrude(amount=-F5_DEPTH)

    # F11 (through all)
    with Locations(Plane.XZ):
        with Locations((-955.0369319916, -458.3015027046), (-955.0369319916, -426.3015027046), (-923.0369319916, -426.3015027046), (-923.0369319916, -458.3015027046), (-923.0369319916, -492.8015027046), (-923.0369319916, -524.8015027046), (-955.0369319916, -492.8015027046), (-955.0369319916, -524.8015027046), (-489.0369319916, -426.3015027046), (-489.0369319916, -458.3015027046), (-489.0369319916, -492.8015027046), (-489.0369319916, -524.8015027046), (-457.0369319916, -524.8015027046), (-457.0369319916, -492.8015027046), (-457.0369319916, -458.3015027046), (-457.0369319916, -426.3015027046)):
            CounterBoreHole(F11_D / 2, F11_CBORE_D / 2, F11_CBORE_DEPTH)

    # F12 (through all)
    with Locations(Plane.XZ):
        with Locations((-970.5369319916, -430.5515027046), (-970.5369319916, -453.0515027046), (-970.5369319916, -475.5515027046), (-970.5369319916, -498.0515027046), (-970.5369319916, -520.5515027046), (-441.5369319916, -520.5515027046), (-441.5369319916, -498.0515027046), (-441.5369319916, -475.5515027046), (-441.5369319916, -453.0515027046), (-441.5369319916, -430.5515027046)):
            Hole(F12_D / 2)


solid = Compound([f1.part, f2.part, f3.part, f4.part, f5.part])
